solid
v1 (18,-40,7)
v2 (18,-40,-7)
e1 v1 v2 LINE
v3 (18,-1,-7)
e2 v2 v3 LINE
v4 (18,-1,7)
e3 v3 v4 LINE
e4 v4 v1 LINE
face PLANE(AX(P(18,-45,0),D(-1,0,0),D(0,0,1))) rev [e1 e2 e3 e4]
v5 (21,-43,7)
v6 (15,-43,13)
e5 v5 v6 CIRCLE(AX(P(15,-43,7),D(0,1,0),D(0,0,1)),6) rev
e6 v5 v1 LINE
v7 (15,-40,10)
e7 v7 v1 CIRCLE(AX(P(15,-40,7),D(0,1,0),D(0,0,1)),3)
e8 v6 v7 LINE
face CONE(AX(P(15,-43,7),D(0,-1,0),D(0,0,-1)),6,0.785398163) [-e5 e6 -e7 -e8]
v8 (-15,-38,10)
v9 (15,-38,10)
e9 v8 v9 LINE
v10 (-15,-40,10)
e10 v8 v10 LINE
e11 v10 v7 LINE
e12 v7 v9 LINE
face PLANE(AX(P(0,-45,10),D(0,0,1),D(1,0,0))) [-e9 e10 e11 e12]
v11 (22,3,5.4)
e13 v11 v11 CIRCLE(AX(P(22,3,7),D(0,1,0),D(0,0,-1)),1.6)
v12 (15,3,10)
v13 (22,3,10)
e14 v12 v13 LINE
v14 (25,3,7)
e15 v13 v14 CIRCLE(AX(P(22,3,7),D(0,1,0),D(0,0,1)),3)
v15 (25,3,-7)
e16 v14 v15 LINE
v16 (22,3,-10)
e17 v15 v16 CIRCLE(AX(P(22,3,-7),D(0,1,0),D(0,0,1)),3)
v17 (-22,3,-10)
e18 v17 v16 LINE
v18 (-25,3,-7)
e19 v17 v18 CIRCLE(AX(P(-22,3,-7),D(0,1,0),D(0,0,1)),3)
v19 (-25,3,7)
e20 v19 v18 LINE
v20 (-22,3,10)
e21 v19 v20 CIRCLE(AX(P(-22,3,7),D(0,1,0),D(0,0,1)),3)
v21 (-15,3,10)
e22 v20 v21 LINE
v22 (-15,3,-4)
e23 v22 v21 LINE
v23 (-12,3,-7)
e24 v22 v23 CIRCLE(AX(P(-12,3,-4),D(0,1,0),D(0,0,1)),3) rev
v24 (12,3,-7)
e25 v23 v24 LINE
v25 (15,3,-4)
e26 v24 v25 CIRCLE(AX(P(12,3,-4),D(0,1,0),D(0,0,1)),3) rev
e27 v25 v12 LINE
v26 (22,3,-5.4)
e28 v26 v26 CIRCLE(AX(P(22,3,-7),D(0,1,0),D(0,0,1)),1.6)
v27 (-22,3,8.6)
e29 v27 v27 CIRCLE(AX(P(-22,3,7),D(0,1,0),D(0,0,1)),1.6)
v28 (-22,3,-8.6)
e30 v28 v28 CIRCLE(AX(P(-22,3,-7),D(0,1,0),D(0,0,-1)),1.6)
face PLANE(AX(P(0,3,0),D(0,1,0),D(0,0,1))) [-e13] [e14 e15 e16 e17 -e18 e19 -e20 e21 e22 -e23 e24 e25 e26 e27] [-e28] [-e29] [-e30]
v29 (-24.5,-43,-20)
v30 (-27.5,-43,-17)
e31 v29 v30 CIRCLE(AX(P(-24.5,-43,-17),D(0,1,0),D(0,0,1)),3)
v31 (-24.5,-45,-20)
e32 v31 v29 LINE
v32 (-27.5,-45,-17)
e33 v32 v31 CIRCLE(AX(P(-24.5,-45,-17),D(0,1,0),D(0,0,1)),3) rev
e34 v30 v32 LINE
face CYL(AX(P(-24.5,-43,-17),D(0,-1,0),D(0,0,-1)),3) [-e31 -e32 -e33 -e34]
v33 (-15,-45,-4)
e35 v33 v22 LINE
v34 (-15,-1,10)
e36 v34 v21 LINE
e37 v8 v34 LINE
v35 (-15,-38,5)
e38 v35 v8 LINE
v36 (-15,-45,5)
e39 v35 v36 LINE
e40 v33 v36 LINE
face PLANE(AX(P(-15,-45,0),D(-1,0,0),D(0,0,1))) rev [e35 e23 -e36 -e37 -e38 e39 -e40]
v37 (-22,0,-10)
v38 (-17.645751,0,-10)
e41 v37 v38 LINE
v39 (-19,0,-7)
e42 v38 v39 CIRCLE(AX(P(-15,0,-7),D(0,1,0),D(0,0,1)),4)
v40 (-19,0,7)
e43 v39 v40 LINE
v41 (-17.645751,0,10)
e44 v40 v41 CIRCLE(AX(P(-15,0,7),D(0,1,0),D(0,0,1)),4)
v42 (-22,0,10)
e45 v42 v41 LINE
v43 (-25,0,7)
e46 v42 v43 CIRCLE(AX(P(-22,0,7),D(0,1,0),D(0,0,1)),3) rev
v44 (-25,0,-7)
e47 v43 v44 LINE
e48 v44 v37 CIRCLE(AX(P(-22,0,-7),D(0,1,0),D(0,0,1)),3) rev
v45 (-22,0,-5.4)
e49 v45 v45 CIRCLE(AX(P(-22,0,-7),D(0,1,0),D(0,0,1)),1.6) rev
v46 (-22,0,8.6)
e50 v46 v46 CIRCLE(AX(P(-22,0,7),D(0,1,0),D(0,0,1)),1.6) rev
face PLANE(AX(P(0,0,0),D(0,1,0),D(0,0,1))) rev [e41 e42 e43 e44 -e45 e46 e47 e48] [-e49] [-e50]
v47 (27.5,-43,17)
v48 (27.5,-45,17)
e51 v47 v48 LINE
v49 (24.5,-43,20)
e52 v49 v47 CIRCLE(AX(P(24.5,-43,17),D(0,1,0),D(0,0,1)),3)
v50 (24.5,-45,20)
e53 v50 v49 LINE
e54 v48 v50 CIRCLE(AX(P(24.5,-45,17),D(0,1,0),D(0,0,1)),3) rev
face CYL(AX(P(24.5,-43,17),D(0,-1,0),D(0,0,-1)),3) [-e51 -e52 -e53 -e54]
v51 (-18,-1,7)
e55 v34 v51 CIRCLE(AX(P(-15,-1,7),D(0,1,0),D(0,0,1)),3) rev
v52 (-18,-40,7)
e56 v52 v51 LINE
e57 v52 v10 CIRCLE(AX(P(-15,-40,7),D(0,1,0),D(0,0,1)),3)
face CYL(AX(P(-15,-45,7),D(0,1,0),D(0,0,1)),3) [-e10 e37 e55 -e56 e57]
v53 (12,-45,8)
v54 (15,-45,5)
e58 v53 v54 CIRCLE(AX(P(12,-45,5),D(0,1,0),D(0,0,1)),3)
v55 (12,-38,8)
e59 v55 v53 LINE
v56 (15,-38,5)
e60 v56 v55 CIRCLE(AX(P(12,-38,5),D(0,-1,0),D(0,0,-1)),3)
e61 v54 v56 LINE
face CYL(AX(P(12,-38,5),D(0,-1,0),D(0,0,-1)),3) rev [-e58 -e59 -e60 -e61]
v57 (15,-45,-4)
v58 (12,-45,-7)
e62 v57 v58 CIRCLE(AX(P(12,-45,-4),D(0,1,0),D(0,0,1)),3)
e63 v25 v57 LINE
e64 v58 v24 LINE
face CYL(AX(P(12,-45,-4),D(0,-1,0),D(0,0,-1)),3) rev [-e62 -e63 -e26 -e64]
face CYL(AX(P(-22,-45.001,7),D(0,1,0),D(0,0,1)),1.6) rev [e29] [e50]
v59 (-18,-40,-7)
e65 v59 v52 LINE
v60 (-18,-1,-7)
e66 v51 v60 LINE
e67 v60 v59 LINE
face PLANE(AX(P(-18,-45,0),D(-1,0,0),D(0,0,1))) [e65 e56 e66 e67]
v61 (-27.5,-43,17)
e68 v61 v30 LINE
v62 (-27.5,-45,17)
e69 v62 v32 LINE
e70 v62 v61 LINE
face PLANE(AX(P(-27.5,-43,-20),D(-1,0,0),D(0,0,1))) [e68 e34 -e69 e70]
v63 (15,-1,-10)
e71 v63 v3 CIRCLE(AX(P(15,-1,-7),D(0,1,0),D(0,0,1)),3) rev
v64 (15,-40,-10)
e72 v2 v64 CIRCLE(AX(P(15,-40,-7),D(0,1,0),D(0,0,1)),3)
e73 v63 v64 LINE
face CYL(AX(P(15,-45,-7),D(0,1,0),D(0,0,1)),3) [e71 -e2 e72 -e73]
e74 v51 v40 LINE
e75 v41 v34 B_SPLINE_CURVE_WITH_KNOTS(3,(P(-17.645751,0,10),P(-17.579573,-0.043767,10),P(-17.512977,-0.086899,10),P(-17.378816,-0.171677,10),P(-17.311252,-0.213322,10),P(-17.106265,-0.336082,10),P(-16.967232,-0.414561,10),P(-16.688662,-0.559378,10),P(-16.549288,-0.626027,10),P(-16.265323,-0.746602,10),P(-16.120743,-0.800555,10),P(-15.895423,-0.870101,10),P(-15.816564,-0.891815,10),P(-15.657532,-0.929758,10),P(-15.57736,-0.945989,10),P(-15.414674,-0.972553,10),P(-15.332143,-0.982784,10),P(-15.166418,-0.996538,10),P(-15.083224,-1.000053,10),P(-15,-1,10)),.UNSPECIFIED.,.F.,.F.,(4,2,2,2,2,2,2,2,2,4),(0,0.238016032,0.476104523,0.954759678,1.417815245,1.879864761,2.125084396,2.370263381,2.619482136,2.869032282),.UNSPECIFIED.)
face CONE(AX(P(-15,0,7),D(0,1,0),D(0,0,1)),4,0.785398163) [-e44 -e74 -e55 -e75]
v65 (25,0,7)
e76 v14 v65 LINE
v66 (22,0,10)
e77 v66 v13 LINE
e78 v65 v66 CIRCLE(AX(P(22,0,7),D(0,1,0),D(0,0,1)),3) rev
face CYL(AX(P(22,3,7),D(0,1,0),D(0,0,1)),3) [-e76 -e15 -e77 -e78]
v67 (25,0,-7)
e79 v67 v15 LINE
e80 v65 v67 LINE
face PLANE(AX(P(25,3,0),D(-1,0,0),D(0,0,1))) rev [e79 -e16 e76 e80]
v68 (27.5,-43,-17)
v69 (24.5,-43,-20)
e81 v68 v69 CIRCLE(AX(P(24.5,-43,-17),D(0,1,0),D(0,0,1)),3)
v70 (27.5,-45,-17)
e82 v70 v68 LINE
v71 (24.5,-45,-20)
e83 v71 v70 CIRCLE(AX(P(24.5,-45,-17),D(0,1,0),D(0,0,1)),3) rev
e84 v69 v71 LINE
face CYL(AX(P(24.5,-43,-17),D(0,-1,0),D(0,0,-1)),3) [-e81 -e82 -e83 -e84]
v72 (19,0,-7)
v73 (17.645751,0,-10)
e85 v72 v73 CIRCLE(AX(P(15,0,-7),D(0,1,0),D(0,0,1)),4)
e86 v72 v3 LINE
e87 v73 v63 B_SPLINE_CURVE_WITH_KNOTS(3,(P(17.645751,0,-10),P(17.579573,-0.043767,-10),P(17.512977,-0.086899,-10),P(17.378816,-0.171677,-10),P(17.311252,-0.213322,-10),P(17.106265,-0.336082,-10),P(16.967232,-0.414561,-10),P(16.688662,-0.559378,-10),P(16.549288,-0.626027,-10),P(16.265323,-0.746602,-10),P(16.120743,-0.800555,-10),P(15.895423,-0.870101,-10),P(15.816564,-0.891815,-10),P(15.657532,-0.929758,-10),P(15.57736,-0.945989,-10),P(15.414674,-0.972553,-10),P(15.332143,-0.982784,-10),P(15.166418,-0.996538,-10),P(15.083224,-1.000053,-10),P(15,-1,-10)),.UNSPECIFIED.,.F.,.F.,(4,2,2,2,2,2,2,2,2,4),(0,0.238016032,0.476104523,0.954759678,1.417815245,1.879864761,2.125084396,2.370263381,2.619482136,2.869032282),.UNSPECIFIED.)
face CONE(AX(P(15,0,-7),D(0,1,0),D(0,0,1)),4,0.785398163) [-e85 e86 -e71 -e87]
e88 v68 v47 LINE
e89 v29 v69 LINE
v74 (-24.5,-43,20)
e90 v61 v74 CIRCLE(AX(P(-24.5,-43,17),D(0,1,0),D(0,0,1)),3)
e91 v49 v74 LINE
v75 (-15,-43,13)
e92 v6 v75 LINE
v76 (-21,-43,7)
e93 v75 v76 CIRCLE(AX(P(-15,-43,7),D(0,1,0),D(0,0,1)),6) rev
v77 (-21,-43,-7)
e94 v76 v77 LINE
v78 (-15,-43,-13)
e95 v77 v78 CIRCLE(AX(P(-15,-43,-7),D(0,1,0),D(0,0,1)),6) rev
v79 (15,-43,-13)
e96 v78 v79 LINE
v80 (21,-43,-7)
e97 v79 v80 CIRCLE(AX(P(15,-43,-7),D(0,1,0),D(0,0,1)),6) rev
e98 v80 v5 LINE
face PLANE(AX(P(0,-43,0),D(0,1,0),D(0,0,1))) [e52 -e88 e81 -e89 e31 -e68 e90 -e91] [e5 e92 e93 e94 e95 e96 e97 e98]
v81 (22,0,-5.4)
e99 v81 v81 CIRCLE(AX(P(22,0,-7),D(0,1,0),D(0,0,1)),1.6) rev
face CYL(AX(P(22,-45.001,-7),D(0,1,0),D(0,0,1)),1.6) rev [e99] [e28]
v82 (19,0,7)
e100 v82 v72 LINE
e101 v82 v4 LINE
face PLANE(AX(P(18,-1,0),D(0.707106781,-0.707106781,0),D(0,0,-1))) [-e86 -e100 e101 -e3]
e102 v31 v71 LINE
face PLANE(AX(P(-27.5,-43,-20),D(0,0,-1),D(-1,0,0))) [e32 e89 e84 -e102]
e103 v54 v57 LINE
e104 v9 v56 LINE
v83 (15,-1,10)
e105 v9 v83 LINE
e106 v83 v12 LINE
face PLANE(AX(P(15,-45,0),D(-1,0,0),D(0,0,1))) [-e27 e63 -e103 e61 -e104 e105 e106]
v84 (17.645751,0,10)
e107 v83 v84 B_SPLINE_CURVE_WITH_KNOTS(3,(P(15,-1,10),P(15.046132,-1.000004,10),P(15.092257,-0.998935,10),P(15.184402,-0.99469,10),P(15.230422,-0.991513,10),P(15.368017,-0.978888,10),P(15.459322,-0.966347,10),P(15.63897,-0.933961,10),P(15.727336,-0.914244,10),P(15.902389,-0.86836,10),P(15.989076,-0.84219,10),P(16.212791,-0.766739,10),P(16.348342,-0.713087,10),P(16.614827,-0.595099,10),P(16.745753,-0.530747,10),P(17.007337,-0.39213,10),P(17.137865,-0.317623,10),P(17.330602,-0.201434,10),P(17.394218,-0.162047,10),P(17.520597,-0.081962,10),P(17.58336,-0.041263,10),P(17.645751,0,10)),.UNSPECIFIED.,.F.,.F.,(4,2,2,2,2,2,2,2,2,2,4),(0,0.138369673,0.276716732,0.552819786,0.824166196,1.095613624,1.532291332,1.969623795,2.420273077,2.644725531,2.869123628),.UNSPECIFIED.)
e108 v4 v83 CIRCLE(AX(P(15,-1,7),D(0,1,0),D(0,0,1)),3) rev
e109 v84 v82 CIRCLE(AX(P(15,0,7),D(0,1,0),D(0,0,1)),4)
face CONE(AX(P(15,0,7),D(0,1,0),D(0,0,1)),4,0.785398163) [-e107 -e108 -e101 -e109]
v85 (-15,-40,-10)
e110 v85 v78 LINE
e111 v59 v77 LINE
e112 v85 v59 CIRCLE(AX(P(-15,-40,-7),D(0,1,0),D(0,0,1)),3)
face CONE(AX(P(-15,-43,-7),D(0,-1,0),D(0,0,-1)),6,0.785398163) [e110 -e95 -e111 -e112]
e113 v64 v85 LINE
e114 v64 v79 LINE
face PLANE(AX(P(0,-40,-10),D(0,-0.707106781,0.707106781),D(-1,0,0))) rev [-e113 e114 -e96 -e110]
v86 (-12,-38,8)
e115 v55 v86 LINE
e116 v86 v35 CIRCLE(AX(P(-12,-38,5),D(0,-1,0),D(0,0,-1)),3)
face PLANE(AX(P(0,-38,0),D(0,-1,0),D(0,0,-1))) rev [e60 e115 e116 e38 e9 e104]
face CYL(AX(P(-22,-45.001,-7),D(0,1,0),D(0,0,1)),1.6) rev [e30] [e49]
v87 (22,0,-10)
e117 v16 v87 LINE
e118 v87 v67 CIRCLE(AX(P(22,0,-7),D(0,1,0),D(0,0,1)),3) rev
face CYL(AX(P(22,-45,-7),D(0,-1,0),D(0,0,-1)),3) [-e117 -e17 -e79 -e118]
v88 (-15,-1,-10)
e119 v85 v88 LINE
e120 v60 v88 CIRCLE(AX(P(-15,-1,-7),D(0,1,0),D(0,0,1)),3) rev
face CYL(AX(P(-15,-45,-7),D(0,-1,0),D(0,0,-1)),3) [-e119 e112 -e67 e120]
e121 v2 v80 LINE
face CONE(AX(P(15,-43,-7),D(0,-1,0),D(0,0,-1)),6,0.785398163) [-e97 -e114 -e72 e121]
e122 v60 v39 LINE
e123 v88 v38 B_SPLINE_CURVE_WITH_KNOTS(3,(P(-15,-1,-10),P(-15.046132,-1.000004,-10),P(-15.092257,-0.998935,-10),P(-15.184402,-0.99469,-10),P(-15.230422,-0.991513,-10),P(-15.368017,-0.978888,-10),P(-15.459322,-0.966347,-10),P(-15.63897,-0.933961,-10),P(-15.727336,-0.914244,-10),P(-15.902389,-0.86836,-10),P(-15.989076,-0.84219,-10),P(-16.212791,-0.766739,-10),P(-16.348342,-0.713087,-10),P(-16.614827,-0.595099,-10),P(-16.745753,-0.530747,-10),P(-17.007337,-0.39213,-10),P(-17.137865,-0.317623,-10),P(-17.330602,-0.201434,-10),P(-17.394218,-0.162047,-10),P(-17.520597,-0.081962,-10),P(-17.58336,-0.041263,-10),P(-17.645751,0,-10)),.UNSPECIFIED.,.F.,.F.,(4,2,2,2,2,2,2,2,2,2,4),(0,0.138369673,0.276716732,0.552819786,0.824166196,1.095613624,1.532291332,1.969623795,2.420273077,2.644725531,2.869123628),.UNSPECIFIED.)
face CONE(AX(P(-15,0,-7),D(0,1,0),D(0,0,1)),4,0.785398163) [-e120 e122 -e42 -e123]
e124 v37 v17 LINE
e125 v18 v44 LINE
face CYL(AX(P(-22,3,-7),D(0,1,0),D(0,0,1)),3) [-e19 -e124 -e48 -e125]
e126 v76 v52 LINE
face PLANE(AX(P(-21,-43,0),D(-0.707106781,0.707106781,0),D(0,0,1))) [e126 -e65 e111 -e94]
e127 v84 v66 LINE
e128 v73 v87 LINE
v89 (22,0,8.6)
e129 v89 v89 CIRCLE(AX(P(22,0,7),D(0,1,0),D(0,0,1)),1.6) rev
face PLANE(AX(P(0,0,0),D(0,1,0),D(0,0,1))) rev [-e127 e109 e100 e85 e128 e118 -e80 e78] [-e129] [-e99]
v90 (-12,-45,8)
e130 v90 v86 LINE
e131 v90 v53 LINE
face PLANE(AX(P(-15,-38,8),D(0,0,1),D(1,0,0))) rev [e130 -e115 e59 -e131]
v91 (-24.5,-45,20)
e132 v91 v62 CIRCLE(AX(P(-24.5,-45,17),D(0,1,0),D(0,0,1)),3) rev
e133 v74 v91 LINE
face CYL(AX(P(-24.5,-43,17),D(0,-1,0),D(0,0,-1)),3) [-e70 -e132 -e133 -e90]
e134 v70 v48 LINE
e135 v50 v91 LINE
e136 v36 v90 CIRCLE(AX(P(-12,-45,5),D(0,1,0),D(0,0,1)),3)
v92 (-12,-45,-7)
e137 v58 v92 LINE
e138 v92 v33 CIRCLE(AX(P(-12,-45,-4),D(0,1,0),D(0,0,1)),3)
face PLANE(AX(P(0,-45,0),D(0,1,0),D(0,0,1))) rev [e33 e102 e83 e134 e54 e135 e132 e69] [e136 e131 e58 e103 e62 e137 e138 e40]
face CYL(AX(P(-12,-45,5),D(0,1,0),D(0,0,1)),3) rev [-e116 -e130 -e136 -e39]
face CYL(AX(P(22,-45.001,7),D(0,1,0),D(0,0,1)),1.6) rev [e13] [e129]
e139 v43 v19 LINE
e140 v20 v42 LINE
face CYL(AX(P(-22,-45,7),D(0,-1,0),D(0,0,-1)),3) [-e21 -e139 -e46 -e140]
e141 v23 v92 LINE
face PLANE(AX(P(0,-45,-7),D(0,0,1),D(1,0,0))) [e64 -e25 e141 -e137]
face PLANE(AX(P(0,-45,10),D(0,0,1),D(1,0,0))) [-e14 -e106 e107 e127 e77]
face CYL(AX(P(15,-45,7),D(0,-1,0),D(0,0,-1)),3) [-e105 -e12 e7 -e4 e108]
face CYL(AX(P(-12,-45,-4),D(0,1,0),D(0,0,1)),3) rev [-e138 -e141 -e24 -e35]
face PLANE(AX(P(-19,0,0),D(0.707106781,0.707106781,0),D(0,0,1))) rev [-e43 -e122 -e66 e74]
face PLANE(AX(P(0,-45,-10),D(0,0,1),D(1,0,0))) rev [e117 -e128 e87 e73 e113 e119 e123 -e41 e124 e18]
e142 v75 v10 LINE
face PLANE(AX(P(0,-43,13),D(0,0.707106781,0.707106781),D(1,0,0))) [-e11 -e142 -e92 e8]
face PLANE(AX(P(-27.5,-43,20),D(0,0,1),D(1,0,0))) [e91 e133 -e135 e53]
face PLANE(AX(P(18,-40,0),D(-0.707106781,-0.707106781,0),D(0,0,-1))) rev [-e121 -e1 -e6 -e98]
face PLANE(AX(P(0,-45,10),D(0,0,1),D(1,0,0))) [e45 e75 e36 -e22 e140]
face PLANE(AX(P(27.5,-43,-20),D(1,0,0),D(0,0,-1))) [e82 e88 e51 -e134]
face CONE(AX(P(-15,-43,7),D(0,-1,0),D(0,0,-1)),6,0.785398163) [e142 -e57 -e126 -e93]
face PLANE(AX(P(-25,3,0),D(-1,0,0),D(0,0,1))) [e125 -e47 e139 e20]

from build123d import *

# Parameters (mm, degrees)
SKETCH_1_W          = 30
SKETCH_1_H          = 3
EXTRUDE_1_DEPTH     = 45
SKETCH_1_3_W        = 7
SKETCH_1_3_H        = 20
SKETCH_1_3_W_2      = 30
SKETCH_1_3_H_2      = 3
EXTRUDE_2_DEPTH     = 3
SKETCH_2_W          = 55
SKETCH_2_H          = 40
EXTRUDE_3_DEPTH     = 2
SKETCH_3_W          = 30
SKETCH_3_H          = 2
EXTRUDE_4_DEPTH     = 5
SKETCH_4_W          = 30
SKETCH_4_H          = 15
CUT_EXTRUDE_1_DEPTH = 58.203583804
CUT_EXTRUDE_2_REACH = 60.824
SKETCH_6_R          = 1.6
FILLET_1_R          = 3
FILLET_2_R          = 3
CHAMFER_1_SIZE      = 3
CHAMFER_2_SIZE      = 1
FILLET_4_R          = 3


# Some blends are built 0.0001 mm under size
with BuildPart() as part:
    # 草图1 → 凸台-拉伸1 (new body)
    with BuildSketch(Plane(origin=(0, 0, 0), x_dir=(1, 0, 0), z_dir=(0, 1, 0))):
        Polygon((18, 10), (15, 10), (15, 7), (15, -10), (18, -10), align=None)
        with Locations((0, 8.5)):
            Rectangle(SKETCH_1_W, SKETCH_1_H)
        Polygon((-15, 7), (-15, 10), (-18, 10), (-18, -10), (-15, -10), align=None)
    extrude(amount=-EXTRUDE_1_DEPTH)

    # 草图1<3> → 凸台-拉伸2 (add)
    with BuildSketch(Plane(origin=(0, 0, 0), x_dir=(1, 0, 0), z_dir=(0, 1, 0))):
        with Locations((-21.5, 0)):
            Rectangle(SKETCH_1_3_W, SKETCH_1_3_H)
        Polygon((-15, 7), (-15, 10), (-18, 10), (-18, -10), (-15, -10), align=None)
        with Locations((0, 8.5)):
            Rectangle(SKETCH_1_3_W_2, SKETCH_1_3_H_2)
        Polygon((18, 10), (15, 10), (15, 7), (15, -10), (18, -10), align=None)
        with Locations((21.5, 0)):
            Rectangle(SKETCH_1_3_W, SKETCH_1_3_H)
    extrude(amount=EXTRUDE_2_DEPTH)

    # 草图2 → 凸台-拉伸3 (add)
    with BuildSketch(Plane.XZ.offset(45)):
        Rectangle(SKETCH_2_W, SKETCH_2_H)
    extrude(amount=-EXTRUDE_3_DEPTH)

    # 草图3 → 凸台-拉伸4 (add)
    with BuildSketch(Plane(origin=(0, -43, 0), x_dir=(1, 0, 0), z_dir=(0, 1, 0))):
        with Locations((0, -9)):
            Rectangle(SKETCH_3_W, SKETCH_3_H)
    extrude(amount=EXTRUDE_4_DEPTH)

    # 草图4 → 切除-拉伸1 (cut, through all)
    with BuildSketch(Plane(origin=(0, -43, 0), x_dir=(1, 0, 0), z_dir=(0, 1, 0))):
        with Locations((0, -0.5)):
            Rectangle(SKETCH_4_W, SKETCH_4_H)
    extrude(amount=-CUT_EXTRUDE_1_DEPTH, mode=Mode.SUBTRACT)

    # 草图6 → 切除-拉伸2 (cut, up to next)
    with BuildSketch(Plane(origin=(0, 3, 0), x_dir=(1, 0, 0), z_dir=(0, 1, 0)), mode=Mode.PRIVATE) as cut_extrude_2_sk1:
        with Locations(Location((-22, -7, 0), (0, 0, 270))):
            Circle(SKETCH_6_R)
    cut_extrude_2_tool1 = extrude(cut_extrude_2_sk1.sketch, amount=-CUT_EXTRUDE_2_REACH, mode=Mode.PRIVATE) & part.part
    # 草图6 → 切除-拉伸2 (cut, up to next)
    with BuildSketch(Plane(origin=(0, 3, 0), x_dir=(1, 0, 0), z_dir=(0, 1, 0)), mode=Mode.PRIVATE) as cut_extrude_2_sk2:
        with Locations(Location((-22, 7, 0), (0, 0, 270))):
            Circle(SKETCH_6_R)
    cut_extrude_2_tool2 = extrude(cut_extrude_2_sk2.sketch, amount=-CUT_EXTRUDE_2_REACH, mode=Mode.PRIVATE) & part.part
    # 草图6 → 切除-拉伸2 (cut, up to next)
    with BuildSketch(Plane(origin=(0, 3, 0), x_dir=(1, 0, 0), z_dir=(0, 1, 0)), mode=Mode.PRIVATE) as cut_extrude_2_sk3:
        with Locations(Location((22, -7, 0), (0, 0, 270))):
            Circle(SKETCH_6_R)
    cut_extrude_2_tool3 = extrude(cut_extrude_2_sk3.sketch, amount=-CUT_EXTRUDE_2_REACH, mode=Mode.PRIVATE) & part.part
    # 草图6 → 切除-拉伸2 (cut, up to next)
    with BuildSketch(Plane(origin=(0, 3, 0), x_dir=(1, 0, 0), z_dir=(0, 1, 0)), mode=Mode.PRIVATE) as cut_extrude_2_sk4:
        with Locations(Location((22, 7, 0), (0, 0, 270))):
            Circle(SKETCH_6_R)
    cut_extrude_2_tool4 = extrude(cut_extrude_2_sk4.sketch, amount=-CUT_EXTRUDE_2_REACH, mode=Mode.PRIVATE) & part.part
    add(cut_extrude_2_tool1.solids().sort_by_distance((-22, 3, 7))[0], mode=Mode.SUBTRACT)
    add(cut_extrude_2_tool2.solids().sort_by_distance((-22, 3, -7))[0], mode=Mode.SUBTRACT)
    add(cut_extrude_2_tool3.solids().sort_by_distance((22, 3, 7))[0], mode=Mode.SUBTRACT)
    add(cut_extrude_2_tool4.solids().sort_by_distance((22, 3, -7))[0], mode=Mode.SUBTRACT)

    # 圆角1
    fillet_1_edges = [part.edges().sort_by_distance(p)[0] for p in [
        (-25, 1.5, 10),
        (25, 1.5, 10),
        (25, 1.5, -10),
        (-25, 1.5, -10),
    ]]
    fillet(fillet_1_edges, radius=FILLET_1_R)

    # 圆角2
    fillet_2_edges = [part.edges().sort_by_distance(p)[0] for p in [
        (-18, -21.5, -10),
        (18, -21.5, -10),
        (-18, -21.5, 10),
        (18, -21.5, 10),
        (27.5, -44, 20),
        (27.5, -44, -20),
        (-27.5, -44, -20),
        (-27.5, -44, 20),
    ]]
    fillet(fillet_2_edges, radius=FILLET_2_R - 0.0001)  # a hair under: the kernel refuses the full size

    # 倒角1
    chamfer_1_edges = [part.edges().sort_by_distance(p)[0] for p in [
        (0, -43, 10),
        (-18, -43, 0),
        (0, -43, -10),
        (18, -43, 0),
        (17.121349633, -43, 9.121349633),
        (-17.121349633, -43, 9.121349633),
        (17.121349633, -43, -9.121349633),
        (-17.121349633, -43, -9.121349633),
    ]]
    chamfer(chamfer_1_edges, length=CHAMFER_1_SIZE)

    # 倒角2
    # the kernel refuses this chamfer: 1 mm, written as the material it adds along each edge
    with BuildSketch(Plane(origin=(18, 0, 7.0001), x_dir=(0.9996219169112968, 0.027495876610586247, 0), z_dir=(0, 0, -1)), Plane(origin=(-18, 0, -7.0001), x_dir=(-0.9996219169112968, 0.02749587661058639, 0), z_dir=(0, 0, 1))) as chamfer_2_piece_1:
        Polygon((CHAMFER_2_SIZE * 0.999621916911, CHAMFER_2_SIZE * 0.0274958766106), (-CHAMFER_2_SIZE * 0.0274958766106, CHAMFER_2_SIZE * 0.999621916911), (0, 0), align=None)
    extrude(amount=14.0002)
    with BuildSketch(Plane(origin=(15.0001, 0, 7.0001), x_dir=(1, 0, 0), z_dir=(0, 0, -1))) as chamfer_2_piece_2_section:
        Polygon((2.9999 + CHAMFER_2_SIZE, 0), (2.9999, CHAMFER_2_SIZE), (2.9999, 0), align=None)
    chamfer_2_piece_2 = revolve(axis=Axis((15.0001, 0, 7.0001), (0, -1, 0)), revolution_arc=139.136895156, mode=Mode.PRIVATE)
    chamfer_2_piece_2 = split(chamfer_2_piece_2, bisect_by=Plane(origin=(18.290229606, -0.281148304, 10), z_dir=(0, 0, -1)), keep=Keep.TOP, mode=Mode.PRIVATE)
    chamfer_2_piece_2 = split(chamfer_2_piece_2, bisect_by=Plane(origin=(15, -0.281148304, 7.827153976), z_dir=(1, 0, 0)), keep=Keep.TOP, mode=Mode.PRIVATE)
    add(chamfer_2_piece_2)
    with BuildSketch(Plane(origin=(-15.0001, 0, 7.0001), x_dir=(-1, 0, 0), z_dir=(0, 0, -1))) as chamfer_2_piece_3_section:
        Polygon((2.9999 + CHAMFER_2_SIZE, 0), (2.9999, -CHAMFER_2_SIZE), (2.9999, 0), align=None)
    chamfer_2_piece_3 = revolve(axis=Axis((-15.0001, 0, 7.0001), (0, 1, 0)), revolution_arc=139.136895156, mode=Mode.PRIVATE)
    chamfer_2_piece_3 = split(chamfer_2_piece_3, bisect_by=Plane(origin=(-18.290229606, -0.281148304, 10), z_dir=(0, 0, -1)), keep=Keep.TOP, mode=Mode.PRIVATE)
    chamfer_2_piece_3 = split(chamfer_2_piece_3, bisect_by=Plane(origin=(-15, -0.281148304, 7.827153976), z_dir=(-1, 0, 0)), keep=Keep.TOP, mode=Mode.PRIVATE)
    add(chamfer_2_piece_3)
    with BuildSketch(Plane(origin=(15.0001, 0, -7.0001), x_dir=(-0.7562749275069748, 0, -0.6542539522420326), z_dir=(-0.6542539522420326, 0, 0.7562749275069748))) as chamfer_2_piece_4_section:
        Polygon((2.9999, CHAMFER_2_SIZE), (2.9999 + CHAMFER_2_SIZE, 0), (2.9999, 0), align=None)
    chamfer_2_piece_4 = revolve(axis=Axis((15.0001, 0, -7.0001), (0, -1, 0)), revolution_arc=139.136895156, mode=Mode.PRIVATE)
    chamfer_2_piece_4 = split(chamfer_2_piece_4, bisect_by=Plane(origin=(17.219196031, -0.376233932, -10), z_dir=(0, 0, 1)), keep=Keep.TOP, mode=Mode.PRIVATE)
    add(chamfer_2_piece_4)
    with BuildSketch(Plane(origin=(-15.0001, 0, -7.0001), x_dir=(0.7562749275069739, 0, -0.6542539522420336), z_dir=(0.6542539522420336, 0, 0.7562749275069739))) as chamfer_2_piece_5_section:
        Polygon((2.9999, -CHAMFER_2_SIZE), (2.9999 + CHAMFER_2_SIZE, 0), (2.9999, 0), align=None)
    chamfer_2_piece_5 = revolve(axis=Axis((-15.0001, 0, -7.0001), (0, 1, 0)), revolution_arc=139.136895156, mode=Mode.PRIVATE)
    chamfer_2_piece_5 = split(chamfer_2_piece_5, bisect_by=Plane(origin=(-17.219196031, -0.376233932, -10), z_dir=(0, 0, 1)), keep=Keep.TOP, mode=Mode.PRIVATE)
    add(chamfer_2_piece_5)

    # 圆角4
    fillet_4_edges = [part.edges().sort_by_distance(p)[0] for p in [
        (-15, -21, -7),
        (15, -21, -7),
        (-15, -41.5, 8),
        (15, -41.5, 8),
    ]]
    fillet(fillet_4_edges, radius=FILLET_4_R)


solid = part.part
